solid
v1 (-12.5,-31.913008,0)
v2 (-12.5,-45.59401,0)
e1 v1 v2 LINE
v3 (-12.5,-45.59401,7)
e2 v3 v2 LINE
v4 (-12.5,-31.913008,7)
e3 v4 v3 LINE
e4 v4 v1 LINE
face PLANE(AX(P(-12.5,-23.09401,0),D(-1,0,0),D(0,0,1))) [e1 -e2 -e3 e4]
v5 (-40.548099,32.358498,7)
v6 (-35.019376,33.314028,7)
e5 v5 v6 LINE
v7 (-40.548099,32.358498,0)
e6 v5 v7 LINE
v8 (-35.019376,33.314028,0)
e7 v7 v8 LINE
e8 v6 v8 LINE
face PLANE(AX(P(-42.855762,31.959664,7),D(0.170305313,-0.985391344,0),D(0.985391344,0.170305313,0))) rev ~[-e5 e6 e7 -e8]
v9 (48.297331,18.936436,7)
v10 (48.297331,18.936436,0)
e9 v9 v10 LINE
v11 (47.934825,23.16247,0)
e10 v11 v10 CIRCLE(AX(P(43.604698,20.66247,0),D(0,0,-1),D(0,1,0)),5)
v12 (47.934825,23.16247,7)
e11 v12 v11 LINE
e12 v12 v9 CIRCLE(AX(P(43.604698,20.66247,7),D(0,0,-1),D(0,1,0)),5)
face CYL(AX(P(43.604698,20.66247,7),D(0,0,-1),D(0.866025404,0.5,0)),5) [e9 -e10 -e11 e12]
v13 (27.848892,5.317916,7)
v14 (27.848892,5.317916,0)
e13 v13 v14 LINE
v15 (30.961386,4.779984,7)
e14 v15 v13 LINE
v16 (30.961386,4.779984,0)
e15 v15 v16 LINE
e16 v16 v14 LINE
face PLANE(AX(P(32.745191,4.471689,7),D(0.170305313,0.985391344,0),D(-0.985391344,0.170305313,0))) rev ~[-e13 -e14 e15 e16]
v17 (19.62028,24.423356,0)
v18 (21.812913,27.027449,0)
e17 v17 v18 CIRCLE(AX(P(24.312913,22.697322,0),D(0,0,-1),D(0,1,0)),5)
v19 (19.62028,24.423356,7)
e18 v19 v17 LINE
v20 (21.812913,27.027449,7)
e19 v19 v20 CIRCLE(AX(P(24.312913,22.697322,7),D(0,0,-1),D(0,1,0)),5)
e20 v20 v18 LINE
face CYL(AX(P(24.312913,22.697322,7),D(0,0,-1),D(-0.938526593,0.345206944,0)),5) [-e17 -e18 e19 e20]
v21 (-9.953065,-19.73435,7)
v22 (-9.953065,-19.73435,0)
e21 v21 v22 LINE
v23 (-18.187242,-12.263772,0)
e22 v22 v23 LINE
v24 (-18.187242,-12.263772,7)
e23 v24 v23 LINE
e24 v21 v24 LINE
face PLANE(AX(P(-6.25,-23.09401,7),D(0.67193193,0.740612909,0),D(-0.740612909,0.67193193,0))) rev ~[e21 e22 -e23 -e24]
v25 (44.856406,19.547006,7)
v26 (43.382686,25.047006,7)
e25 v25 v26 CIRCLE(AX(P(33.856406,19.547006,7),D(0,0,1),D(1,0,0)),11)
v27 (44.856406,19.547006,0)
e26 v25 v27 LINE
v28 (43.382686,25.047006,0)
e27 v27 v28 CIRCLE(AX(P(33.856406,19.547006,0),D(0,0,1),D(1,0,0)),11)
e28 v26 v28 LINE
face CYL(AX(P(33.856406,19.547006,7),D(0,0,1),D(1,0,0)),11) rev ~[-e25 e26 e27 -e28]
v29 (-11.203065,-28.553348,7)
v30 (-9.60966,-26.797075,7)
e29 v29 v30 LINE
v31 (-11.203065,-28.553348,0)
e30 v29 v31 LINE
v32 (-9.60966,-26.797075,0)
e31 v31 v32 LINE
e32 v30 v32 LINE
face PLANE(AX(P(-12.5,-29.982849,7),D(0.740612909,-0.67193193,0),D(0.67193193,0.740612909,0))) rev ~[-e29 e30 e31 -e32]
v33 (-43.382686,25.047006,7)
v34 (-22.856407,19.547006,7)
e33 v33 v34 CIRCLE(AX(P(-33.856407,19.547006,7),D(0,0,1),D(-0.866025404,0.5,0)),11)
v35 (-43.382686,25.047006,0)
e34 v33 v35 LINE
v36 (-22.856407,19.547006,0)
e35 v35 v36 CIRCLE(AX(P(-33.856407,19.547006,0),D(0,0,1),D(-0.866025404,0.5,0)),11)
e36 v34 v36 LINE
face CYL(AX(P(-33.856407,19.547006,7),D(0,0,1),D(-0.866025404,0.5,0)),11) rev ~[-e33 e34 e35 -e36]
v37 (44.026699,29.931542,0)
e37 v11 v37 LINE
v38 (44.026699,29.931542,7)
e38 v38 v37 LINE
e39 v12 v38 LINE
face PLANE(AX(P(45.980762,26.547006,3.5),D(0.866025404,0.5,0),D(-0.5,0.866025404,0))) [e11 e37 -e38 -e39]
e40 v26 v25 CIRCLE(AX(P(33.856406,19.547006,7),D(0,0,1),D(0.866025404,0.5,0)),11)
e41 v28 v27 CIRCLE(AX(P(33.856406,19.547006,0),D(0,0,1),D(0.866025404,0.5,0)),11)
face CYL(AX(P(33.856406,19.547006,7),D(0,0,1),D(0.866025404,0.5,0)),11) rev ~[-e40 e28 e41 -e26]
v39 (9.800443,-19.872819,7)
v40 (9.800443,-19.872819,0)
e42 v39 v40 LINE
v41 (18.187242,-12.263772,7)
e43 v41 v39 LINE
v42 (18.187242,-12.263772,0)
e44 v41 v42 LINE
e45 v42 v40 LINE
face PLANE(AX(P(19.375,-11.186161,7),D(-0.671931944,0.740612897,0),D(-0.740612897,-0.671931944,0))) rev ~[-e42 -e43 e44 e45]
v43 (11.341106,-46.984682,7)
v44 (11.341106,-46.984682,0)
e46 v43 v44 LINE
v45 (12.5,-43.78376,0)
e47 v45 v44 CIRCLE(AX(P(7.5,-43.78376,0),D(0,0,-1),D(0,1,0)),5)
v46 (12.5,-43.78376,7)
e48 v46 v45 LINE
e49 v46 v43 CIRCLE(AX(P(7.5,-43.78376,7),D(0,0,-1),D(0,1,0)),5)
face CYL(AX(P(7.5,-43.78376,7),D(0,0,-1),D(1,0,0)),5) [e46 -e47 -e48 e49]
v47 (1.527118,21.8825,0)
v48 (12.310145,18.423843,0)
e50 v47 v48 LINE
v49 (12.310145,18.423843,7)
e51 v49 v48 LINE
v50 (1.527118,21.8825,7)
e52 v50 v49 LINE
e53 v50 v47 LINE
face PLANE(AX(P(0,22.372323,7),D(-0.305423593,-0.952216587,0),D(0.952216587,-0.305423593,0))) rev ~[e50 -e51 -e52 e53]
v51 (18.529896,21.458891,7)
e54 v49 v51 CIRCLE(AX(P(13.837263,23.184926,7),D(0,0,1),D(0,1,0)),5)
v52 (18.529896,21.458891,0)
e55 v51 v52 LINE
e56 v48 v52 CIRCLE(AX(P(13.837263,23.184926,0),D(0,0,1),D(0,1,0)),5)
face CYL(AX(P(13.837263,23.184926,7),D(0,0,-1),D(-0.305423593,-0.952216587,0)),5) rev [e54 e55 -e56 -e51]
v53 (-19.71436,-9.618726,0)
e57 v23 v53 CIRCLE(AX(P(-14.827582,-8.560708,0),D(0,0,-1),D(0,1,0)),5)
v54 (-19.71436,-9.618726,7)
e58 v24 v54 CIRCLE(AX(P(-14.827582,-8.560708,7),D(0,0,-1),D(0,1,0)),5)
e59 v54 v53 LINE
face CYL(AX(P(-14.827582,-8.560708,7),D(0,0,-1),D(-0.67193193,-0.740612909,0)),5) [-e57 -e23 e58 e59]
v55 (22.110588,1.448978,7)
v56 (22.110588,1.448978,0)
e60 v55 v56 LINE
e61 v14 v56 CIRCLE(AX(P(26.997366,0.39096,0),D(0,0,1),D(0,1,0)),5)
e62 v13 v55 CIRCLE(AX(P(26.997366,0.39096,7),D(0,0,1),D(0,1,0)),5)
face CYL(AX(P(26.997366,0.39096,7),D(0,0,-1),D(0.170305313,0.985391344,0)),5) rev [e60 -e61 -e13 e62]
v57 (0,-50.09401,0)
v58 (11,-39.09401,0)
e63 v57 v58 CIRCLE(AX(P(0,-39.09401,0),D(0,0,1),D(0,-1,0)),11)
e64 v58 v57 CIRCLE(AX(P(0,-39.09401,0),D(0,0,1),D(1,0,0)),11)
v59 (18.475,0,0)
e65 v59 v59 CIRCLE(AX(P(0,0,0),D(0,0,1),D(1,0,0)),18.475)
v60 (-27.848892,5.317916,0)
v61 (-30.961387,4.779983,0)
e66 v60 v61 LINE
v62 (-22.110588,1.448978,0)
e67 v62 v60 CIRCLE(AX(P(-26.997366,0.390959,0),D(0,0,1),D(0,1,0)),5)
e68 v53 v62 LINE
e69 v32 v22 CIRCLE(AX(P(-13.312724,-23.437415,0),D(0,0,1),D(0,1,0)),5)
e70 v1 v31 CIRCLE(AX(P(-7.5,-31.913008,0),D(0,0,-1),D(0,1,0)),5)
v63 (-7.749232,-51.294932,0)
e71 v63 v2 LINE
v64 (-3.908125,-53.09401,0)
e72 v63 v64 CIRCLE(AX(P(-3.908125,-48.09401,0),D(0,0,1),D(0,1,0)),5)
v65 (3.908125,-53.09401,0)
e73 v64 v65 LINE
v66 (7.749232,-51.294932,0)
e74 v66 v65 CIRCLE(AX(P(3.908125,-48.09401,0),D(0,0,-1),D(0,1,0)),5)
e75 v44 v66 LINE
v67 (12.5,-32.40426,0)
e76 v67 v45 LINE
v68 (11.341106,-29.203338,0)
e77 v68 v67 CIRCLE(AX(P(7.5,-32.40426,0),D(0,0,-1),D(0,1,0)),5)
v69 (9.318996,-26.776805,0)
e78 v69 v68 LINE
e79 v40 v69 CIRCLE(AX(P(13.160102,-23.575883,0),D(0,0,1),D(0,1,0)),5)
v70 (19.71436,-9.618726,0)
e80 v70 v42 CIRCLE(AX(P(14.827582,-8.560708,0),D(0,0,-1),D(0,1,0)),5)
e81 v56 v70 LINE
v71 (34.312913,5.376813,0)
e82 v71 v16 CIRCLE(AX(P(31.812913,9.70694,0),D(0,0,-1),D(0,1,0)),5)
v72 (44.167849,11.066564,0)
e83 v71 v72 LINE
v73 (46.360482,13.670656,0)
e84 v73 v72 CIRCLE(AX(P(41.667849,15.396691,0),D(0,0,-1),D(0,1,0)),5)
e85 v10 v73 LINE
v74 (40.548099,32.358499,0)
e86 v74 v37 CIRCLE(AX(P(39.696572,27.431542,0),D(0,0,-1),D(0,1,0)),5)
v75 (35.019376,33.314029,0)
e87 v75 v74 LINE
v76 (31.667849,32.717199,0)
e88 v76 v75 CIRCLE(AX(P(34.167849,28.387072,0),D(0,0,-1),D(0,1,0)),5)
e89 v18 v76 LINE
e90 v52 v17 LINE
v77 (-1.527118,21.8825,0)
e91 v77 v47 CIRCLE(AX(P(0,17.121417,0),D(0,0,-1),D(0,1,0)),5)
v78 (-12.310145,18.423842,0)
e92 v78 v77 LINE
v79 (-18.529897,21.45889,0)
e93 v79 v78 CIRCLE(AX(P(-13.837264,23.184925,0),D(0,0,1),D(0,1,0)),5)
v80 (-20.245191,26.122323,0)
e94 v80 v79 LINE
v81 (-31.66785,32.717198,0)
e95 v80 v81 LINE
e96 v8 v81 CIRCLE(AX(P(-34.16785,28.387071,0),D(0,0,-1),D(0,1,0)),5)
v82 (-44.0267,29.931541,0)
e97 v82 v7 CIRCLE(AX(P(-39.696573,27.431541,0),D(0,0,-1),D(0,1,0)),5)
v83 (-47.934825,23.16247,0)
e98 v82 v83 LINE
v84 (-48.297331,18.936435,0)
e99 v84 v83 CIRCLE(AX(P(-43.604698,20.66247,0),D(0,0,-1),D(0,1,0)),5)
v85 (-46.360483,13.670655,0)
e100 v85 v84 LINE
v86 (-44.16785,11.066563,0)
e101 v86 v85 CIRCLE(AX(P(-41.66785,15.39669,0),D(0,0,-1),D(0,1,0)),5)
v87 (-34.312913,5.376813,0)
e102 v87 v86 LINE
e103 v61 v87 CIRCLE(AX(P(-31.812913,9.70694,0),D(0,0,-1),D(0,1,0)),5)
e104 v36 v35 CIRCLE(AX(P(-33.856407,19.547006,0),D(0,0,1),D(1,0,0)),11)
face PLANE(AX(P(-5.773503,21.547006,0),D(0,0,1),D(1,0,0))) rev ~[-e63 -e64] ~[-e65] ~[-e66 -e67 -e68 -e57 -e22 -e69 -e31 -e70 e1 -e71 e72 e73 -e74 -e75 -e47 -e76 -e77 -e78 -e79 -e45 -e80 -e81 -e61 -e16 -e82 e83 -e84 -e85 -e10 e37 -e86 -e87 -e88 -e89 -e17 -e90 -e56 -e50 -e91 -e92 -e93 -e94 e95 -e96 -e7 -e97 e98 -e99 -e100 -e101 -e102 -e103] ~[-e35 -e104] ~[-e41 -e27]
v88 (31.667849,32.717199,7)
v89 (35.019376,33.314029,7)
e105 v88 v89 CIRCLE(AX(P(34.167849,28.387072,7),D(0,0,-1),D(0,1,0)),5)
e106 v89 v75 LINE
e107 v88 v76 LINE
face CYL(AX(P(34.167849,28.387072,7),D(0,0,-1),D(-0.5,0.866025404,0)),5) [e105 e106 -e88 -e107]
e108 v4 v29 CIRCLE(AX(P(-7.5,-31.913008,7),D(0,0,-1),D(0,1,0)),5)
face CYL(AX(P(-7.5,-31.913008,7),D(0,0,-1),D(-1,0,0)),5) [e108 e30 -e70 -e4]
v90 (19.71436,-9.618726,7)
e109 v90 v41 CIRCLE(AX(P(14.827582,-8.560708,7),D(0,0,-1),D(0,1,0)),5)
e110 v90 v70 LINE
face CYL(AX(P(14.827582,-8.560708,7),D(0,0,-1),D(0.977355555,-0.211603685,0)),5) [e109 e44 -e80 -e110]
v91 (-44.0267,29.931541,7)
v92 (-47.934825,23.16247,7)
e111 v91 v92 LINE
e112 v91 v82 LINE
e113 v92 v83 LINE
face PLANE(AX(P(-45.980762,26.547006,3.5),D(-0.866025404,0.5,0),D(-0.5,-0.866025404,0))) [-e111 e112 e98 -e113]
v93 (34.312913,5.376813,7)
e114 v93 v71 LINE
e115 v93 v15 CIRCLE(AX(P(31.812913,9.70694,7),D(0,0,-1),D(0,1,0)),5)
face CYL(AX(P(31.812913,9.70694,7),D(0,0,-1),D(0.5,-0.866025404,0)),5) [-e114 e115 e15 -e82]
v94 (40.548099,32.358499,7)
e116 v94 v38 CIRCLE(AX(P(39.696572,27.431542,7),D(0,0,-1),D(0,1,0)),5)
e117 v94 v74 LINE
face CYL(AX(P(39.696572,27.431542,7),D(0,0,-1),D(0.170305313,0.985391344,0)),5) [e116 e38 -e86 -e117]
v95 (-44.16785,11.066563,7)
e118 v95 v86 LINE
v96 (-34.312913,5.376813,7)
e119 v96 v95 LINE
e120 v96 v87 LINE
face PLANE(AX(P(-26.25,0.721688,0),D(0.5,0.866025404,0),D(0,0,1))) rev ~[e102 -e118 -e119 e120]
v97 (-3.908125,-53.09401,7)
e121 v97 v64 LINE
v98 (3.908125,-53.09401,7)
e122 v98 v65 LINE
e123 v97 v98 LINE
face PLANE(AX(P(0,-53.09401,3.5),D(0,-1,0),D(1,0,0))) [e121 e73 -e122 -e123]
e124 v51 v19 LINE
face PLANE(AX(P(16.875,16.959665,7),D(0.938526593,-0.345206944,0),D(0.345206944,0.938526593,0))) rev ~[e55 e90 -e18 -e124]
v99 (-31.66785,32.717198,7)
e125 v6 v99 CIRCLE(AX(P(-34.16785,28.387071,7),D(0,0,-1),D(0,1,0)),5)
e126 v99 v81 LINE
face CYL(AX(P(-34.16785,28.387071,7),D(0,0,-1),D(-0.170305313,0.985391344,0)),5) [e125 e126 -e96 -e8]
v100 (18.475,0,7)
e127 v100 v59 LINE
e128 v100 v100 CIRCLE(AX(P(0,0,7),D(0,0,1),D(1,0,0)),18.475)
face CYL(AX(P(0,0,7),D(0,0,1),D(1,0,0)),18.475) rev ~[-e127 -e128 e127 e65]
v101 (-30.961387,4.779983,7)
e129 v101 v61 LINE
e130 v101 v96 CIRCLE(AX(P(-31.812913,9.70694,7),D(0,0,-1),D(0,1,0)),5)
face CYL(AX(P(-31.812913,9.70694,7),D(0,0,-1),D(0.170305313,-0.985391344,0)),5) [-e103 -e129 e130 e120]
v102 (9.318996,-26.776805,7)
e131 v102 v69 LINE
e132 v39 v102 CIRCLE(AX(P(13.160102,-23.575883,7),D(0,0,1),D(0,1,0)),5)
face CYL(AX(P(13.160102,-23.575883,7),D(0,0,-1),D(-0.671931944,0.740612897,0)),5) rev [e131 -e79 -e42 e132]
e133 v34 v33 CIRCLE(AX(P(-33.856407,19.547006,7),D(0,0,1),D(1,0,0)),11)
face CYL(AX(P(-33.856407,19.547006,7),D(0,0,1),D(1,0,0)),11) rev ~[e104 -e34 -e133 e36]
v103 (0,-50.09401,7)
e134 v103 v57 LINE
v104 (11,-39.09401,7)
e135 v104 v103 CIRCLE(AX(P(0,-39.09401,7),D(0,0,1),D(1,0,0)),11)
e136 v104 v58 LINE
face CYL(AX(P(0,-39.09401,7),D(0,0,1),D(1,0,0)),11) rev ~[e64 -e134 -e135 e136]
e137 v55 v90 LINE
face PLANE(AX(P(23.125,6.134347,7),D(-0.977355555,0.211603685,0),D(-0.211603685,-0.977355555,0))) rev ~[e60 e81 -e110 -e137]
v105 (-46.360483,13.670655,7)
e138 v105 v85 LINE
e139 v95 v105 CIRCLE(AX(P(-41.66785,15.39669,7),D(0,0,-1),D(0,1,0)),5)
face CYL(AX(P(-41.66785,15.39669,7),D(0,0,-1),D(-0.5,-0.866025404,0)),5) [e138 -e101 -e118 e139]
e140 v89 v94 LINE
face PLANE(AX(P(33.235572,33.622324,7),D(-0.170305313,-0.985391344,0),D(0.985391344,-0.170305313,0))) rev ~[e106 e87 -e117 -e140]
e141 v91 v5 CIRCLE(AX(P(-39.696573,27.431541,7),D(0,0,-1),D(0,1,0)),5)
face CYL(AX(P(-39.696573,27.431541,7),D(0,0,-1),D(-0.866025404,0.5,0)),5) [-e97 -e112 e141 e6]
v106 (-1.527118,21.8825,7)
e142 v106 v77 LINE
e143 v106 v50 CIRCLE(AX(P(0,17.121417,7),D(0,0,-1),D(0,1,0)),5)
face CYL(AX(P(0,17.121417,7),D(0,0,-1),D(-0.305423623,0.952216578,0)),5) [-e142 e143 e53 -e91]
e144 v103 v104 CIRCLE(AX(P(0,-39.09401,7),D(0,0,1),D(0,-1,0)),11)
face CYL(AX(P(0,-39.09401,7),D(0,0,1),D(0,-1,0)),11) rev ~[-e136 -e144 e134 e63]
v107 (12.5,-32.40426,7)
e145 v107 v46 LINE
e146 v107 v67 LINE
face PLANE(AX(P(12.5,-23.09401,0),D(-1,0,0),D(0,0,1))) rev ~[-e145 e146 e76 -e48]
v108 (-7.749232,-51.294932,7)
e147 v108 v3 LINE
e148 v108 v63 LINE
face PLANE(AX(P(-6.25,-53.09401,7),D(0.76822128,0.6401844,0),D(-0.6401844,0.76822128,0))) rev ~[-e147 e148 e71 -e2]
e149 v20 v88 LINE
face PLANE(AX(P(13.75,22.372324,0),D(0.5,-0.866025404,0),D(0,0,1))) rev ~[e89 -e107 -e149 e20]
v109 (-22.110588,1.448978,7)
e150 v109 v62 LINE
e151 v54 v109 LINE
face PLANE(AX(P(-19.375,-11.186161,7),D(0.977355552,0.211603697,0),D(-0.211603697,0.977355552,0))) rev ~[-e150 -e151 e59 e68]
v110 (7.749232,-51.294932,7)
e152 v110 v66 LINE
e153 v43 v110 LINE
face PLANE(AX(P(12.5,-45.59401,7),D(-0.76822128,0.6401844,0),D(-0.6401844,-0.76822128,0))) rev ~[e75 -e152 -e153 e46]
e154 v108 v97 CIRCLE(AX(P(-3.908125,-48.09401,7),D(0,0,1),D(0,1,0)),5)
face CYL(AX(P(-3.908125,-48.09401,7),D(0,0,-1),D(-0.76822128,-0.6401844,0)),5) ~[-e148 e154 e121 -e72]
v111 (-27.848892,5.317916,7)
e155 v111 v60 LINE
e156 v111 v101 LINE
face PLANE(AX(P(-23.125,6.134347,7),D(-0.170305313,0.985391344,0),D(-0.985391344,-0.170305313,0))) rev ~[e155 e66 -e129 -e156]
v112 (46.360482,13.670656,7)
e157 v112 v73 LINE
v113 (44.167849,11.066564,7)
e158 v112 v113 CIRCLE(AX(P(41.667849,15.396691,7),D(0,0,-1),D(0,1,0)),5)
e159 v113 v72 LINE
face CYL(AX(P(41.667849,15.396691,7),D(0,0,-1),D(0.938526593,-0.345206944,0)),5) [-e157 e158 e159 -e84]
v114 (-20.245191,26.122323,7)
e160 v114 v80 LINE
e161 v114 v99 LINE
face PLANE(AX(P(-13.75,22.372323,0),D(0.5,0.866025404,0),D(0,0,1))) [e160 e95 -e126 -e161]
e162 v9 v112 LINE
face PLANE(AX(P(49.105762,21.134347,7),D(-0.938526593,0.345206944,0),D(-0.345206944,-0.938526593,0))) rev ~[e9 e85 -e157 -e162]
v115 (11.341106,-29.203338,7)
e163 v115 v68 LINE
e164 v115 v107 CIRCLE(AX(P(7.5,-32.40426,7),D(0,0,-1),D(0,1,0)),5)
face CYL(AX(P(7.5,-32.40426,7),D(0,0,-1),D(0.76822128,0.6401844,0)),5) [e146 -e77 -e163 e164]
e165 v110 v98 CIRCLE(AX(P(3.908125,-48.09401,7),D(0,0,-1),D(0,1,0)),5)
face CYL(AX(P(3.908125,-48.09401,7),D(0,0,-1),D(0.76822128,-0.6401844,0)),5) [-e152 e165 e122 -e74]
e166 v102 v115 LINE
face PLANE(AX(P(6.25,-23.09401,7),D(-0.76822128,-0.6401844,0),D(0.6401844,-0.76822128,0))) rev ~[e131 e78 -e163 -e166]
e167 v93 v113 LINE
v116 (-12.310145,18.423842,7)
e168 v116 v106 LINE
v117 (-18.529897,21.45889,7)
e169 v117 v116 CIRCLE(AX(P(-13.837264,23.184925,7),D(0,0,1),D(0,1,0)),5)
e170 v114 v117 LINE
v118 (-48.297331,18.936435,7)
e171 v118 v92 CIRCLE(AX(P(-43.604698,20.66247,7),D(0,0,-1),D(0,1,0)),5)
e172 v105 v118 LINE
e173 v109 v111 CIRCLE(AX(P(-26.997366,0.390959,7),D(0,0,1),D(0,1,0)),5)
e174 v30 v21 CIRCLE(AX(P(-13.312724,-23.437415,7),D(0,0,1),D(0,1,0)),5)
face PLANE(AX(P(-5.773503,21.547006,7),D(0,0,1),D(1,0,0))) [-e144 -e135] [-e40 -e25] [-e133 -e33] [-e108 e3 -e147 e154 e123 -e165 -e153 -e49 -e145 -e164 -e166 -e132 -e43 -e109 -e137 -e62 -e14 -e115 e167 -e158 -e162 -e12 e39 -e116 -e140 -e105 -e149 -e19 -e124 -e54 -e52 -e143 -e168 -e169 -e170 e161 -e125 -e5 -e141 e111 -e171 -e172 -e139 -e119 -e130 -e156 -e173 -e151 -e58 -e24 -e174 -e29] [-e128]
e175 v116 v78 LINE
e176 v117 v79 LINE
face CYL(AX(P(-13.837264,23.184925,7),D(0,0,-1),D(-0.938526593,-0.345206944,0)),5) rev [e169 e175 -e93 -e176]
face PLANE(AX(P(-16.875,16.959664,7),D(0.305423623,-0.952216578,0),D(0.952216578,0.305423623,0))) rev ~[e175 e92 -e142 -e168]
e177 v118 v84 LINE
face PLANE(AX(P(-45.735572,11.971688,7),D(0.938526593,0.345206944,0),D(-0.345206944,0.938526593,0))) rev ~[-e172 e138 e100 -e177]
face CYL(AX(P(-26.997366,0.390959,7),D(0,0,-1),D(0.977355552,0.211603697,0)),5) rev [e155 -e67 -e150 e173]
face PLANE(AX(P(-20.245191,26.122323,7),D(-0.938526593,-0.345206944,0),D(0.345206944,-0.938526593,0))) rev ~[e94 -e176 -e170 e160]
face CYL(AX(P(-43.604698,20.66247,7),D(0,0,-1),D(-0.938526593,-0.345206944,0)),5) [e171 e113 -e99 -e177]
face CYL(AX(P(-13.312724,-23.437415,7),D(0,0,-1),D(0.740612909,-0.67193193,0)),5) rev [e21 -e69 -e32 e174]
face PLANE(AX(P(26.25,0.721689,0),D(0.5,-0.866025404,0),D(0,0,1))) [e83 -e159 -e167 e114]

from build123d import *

# Parameters (mm, degrees)
F1_DEPTH  = 7
F3_R      = 18.475
F4_DEPTH  = 25
F5_W      = 25
F5_H      = 7
F6_DEPTH  = 30
F7_W      = 25
F7_H      = 7
F8_DEPTH  = 30
F9_W      = 25
F9_H      = 7
F10_DEPTH = 30
F12_DEPTH = 25
F14_DEPTH = 25
F16_DEPTH = 25
F17_R     = 5


with BuildPart() as f1:
    # F0 (on Top) → F1 (new body)
    with BuildSketch(Plane.XY):
        Polygon((-20, 34.6410161514), (0, 23.0940107676), (0, 69.2820323028), align=None)
        Polygon((0, 23.0940107676), (20, 34.6410161514), (0, 69.2820323028), align=None)
        Polygon((0, 23.0940107676), (40, 0), (20, 34.6410161514), align=None)
        Polygon((0, 0), (40, 0), (0, 23.0940107676), align=None)
        Polygon((-40, 0), (0, 0), (0, 23.0940107676), align=None)
        Polygon((-40, 0), (0, 23.0940107676), (-20, 34.6410161514), align=None)
    extrude(amount=F1_DEPTH)


with BuildPart() as f1_1:
    # F2: moved
    add(f1.part.moved(Location((0, -23.09401, 0))))

    # F3 (on face) → F4 (cut)
    with BuildSketch(Plane.XY.offset(7)):
        Circle(F3_R)
    extrude(amount=-F4_DEPTH, mode=Mode.SUBTRACT)

    # F5 (on face) → F6 (join)
    with BuildSketch(Plane.XZ.offset(23.09401)):
        with Locations((0, 3.5)):
            Rectangle(F5_W, F5_H)
    extrude(amount=F6_DEPTH)

    # F7 (on face) → F8 (join)
    with BuildSketch(Plane(origin=(20.0000003324, 11.5470055757, 0), x_dir=(-0.5, 0.8660254038, 0), z_dir=(0.8660254038, 0.5, 0))):
        with Locations((6.647e-07, 3.5)):
            Rectangle(F7_W, F7_H)
    extrude(amount=F8_DEPTH)

    # F9 (on face) → F10 (join)
    with BuildSketch(Plane(origin=(-20.0000003324, 11.5470055757, 0), x_dir=(-0.5, -0.8660254038, 0), z_dir=(-0.8660254038, 0.5, 0))):
        with Locations((0, 3.5)):
            Rectangle(F9_W, F9_H)
    extrude(amount=F10_DEPTH)

    # F11 (on face) → F12 (cut)
    with BuildSketch(Plane.XY.offset(7)):
        Polygon((0, 46.1880223028), (-13.7500003324, 22.372323123), (13.75, 22.3723236987), align=None)
        Polygon((26.25, 0.7216886041), (12.5, -23.09401), (40, -23.09401), align=None)
        Polygon((-12.5, -23.09401), (-26.2500003324, 0.7216880284), (-40, -23.09401), align=None)
    extrude(amount=-F12_DEPTH, mode=Mode.SUBTRACT)

    # F13 (on face) → F14 (cut)
    with BuildSketch(Plane.XY.offset(7)):
        with BuildLine():
            ThreePointArc((-22.8564067929, 19.5470055757), (-31.0093972968, 30.1721896649), (-43.3826862346, 25.0470055757))
            ThreePointArc((-43.3826862346, 25.0470055757), (-36.7034162891, 8.9218214865), (-22.8564067929, 19.5470055757))
        make_face()
        with BuildLine():
            ThreePointArc((44.8564064606, 19.5470061514), (44.4815905497, 22.3940156475), (43.3826859022, 25.0470061514))
            ThreePointArc((43.3826859022, 25.0470061514), (23.2312223714, 16.6999966552), (44.8564064606, 19.5470061514))
        make_face()
        with BuildLine():
            ThreePointArc((11, -39.09401), (-7.7781745931, -31.3158354069), (0, -50.09401))
            ThreePointArc((0, -50.09401), (7.7781745931, -46.8721845931), (11, -39.09401))
        make_face()
    extrude(amount=-F14_DEPTH, mode=Mode.SUBTRACT)

    # F15 (on face) → F16 (cut)
    with BuildSketch(Plane.XY.offset(7)):
        Polygon((-20.2451908608, 26.122323123), (-16.8750003324, 16.9596643493), (-13.7500003324, 22.372323123), align=None)
        Polygon((-13.7500003324, 22.372323123), (-16.8750003324, 16.9596643493), (-1.662e-07, 22.3723234108), align=None)
        Polygon((13.75, 22.3723236987), (-1.662e-07, 22.3723234108), (16.875, 16.959664925), align=None)
        Polygon((13.75, 22.3723236987), (16.875, 16.959664925), (20.2451905284, 26.1223236987), align=None)
        Polygon((32.7451905284, 4.4716886041), (23.125, 6.1343473777), (26.25, 0.7216886041), align=None)
        Polygon((23.125, 6.1343473777), (19.375, -11.186160698), (26.25, 0.7216886041), align=None)
        Polygon((19.375, -11.186160698), (6.25, -23.09401), (12.5, -23.09401), align=None)
        Polygon((12.5, -23.09401), (6.25, -23.09401), (12.5, -30.59401), align=None)
        Polygon((-12.5, -29.9828486929), (-6.25, -23.09401), (-12.5, -23.09401), align=None)
        Polygon((-6.25, -23.09401), (-19.3750001662, -11.1861609858), (-12.5, -23.09401), align=None)
        Polygon((-23.1250003324, 6.134346802), (-26.2500003324, 0.7216880284), (-19.3750001662, -11.1861609858), align=None)
        Polygon((-32.7451908608, 4.4716880284), (-26.2500003324, 0.7216880284), (-23.1250003324, 6.134346802), align=None)
        Polygon((-52.2307624459, 15.7216880284), (-45.7355719175, 11.9716880284), (-49.1057624459, 21.134346802), align=None)
        Polygon((-42.8557624459, 31.9596643493), (-33.2355719175, 33.622323123), (-39.7307624459, 37.372323123), align=None)
        Polygon((39.7307621135, 37.3723236987), (33.2355715851, 33.6223236987), (42.8557621135, 31.959664925), align=None)
        Polygon((49.1057621135, 21.1343473777), (45.7355715851, 11.9716886041), (52.2307621135, 15.7216886041), align=None)
        Polygon((12.5, -53.09401), (12.5, -45.59401), (6.25, -53.09401), align=None)
        Polygon((-6.25, -53.09401), (-12.5, -45.59401), (-12.5, -53.09401), align=None)
    extrude(amount=-F16_DEPTH, mode=Mode.SUBTRACT)

    # F17
    f17_edges = [f1_1.edges().sort_by_distance(p)[0] for p in [
        (6.25, -53.09401, 3.5),
        (12.5, -45.59401, 3.5),
        (12.5, -30.59401, 3.5),
        (-6.25, -53.09401, 3.5),
        (23.125, 6.134347, 3.5),
        (32.745191, 4.471689, 3.5),
        (45.735572, 11.971689, 3.5),
        (6.25, -23.09401, 3.5),
        (49.105762, 21.134347, 3.5),
        (42.855762, 31.959665, 3.5),
        (33.235572, 33.622324, 3.5),
        (20.245191, 26.122324, 3.5),
        (-33.235572, 33.622323, 3.5),
        (-12.5, -29.982849, 3.5),
        (-42.855762, 31.959664, 3.5),
        (-49.105762, 21.134347, 3.5),
        (-16.875, 16.959664, 3.5),
        (-23.125, 6.134347, 3.5),
        (-32.745191, 4.471688, 3.5),
        (-45.735572, 11.971688, 3.5),
        (-6.25, -23.09401, 3.5),
        (-19.375, -11.186161, 3.5),
        (0, 22.372323, 3.5),
        (16.875, 16.959665, 3.5),
        (19.375, -11.186161, 3.5),
    ]]
    fillet(f17_edges, radius=F17_R)


solid = f1_1.part
